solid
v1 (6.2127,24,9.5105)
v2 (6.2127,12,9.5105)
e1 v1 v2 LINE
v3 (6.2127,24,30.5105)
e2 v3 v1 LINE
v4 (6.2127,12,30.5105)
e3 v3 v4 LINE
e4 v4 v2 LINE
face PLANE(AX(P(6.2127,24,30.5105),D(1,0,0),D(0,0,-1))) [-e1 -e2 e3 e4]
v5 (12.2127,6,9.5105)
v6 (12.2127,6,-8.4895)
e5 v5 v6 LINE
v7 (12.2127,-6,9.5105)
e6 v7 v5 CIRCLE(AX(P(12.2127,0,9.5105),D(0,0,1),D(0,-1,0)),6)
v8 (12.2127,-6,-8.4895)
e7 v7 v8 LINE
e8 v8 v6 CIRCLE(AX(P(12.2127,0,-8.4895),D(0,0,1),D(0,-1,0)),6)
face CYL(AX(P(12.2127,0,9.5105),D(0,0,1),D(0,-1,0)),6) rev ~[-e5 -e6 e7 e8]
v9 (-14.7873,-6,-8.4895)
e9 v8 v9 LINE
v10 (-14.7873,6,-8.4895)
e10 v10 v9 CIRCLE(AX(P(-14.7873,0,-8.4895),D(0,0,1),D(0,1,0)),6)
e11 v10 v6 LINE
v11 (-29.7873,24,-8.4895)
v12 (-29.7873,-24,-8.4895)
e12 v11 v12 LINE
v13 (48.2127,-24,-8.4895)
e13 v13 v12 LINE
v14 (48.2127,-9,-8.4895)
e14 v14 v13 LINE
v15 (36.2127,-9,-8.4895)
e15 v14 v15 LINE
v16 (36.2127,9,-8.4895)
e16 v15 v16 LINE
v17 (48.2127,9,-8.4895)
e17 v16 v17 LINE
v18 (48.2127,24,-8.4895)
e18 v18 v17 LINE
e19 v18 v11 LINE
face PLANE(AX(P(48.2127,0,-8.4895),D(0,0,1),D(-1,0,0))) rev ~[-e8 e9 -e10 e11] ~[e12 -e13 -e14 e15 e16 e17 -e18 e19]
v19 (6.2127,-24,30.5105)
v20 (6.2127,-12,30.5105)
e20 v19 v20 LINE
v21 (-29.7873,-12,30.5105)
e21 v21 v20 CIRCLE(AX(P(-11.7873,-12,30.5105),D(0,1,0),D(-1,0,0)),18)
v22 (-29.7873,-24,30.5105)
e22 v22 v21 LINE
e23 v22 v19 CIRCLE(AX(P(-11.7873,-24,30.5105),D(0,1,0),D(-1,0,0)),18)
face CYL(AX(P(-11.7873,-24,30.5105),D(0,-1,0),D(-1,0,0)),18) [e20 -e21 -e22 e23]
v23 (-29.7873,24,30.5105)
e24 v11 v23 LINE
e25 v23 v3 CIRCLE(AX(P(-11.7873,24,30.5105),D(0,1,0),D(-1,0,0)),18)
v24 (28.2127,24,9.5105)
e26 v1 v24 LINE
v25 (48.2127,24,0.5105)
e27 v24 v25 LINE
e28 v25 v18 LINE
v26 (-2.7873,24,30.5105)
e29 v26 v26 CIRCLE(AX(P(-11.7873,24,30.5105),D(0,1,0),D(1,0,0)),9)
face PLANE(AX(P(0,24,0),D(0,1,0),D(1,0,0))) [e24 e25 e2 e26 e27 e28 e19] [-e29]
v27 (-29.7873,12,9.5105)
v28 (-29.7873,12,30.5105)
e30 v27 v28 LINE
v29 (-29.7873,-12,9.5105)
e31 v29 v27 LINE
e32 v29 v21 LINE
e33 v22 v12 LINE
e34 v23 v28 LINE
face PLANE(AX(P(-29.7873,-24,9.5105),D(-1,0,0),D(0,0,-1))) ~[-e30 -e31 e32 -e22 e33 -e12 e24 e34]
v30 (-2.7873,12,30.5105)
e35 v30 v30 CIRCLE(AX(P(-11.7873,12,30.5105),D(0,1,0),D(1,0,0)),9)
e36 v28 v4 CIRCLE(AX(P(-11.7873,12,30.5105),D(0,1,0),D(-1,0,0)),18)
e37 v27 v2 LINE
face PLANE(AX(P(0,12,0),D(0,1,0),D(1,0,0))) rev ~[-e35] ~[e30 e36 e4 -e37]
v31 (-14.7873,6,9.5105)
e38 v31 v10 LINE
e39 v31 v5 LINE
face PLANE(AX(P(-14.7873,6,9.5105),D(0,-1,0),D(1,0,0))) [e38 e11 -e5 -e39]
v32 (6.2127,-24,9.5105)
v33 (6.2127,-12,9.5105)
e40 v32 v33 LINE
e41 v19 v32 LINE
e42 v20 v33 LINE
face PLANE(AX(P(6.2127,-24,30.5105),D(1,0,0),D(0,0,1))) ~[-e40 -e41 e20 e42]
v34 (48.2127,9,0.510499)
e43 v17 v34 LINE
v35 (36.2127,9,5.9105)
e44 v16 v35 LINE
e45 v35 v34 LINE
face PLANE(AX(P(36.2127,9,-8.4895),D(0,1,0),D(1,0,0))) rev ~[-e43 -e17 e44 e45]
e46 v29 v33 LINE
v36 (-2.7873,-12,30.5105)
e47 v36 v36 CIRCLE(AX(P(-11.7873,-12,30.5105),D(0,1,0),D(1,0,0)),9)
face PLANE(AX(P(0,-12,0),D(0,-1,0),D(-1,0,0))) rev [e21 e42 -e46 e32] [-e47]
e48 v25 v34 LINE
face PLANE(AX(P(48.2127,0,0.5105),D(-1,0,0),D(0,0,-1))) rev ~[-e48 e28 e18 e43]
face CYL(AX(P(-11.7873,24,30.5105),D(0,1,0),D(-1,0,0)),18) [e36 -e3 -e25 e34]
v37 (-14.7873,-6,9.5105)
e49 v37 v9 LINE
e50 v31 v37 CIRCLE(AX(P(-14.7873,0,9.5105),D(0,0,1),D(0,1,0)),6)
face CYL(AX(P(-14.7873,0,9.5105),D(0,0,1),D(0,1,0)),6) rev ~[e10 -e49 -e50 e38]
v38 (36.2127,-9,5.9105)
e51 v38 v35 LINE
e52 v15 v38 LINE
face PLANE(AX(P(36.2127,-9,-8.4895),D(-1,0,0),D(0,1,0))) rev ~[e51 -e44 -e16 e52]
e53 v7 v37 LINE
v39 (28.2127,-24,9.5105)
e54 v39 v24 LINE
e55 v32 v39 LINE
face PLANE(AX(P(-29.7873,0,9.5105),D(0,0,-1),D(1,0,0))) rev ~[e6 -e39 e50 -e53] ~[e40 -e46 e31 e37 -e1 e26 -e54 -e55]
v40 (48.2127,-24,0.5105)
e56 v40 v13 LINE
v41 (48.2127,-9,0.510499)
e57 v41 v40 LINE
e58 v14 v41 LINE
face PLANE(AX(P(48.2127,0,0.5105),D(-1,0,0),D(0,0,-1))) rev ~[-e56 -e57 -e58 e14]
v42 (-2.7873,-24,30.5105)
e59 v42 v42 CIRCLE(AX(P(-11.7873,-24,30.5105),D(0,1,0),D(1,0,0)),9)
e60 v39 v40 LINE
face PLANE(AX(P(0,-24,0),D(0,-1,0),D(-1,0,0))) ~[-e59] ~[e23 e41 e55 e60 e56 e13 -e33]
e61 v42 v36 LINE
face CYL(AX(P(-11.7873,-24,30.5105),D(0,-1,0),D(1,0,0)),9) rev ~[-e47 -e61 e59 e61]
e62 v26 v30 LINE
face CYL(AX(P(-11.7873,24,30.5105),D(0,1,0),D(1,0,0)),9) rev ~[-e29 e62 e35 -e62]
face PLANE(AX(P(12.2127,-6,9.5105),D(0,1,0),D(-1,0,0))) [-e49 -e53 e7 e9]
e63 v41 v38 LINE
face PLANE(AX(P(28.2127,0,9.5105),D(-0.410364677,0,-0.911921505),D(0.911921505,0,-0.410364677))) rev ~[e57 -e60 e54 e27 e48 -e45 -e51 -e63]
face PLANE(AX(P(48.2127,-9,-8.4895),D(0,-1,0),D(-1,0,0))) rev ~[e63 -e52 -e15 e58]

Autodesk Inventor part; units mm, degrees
ref_plane "YZ Plane" through (0, 0, 0) normal (1, 0, 0) x (0, 1, 0)
ref_plane "XZ Plane" through (0, 0, 0) normal (0, 1, 0) x (-1, 0, 0)
ref_plane "XY Plane" through (0, 0, 0) normal (0, 0, 1) x (1, 0, 0)
sketch "草图2" plane through (0, 0, 0) normal (0, 1, 0) x (-1, 0, 0)
  line L0 (29.7873, 9.5105) -> (-28.2127, 9.5105)
  line L1 (-28.2127, 9.5105) -> (-48.2127, 0.5105)
  line L2 (-48.2127, 0.5105) -> (-48.2127, -8.4895)
  line L3 (-48.2127, -8.4895) -> (29.7873, -8.4895)
  line L4 (29.7873, -8.4895) -> (29.7873, 9.5105)
  dimension "d3" = 9
  dimension "d4" = 78
  dimension "d5" = 18
  dimension "d6" = 58
extrude "拉伸1" add sketch "草图2" along normal mid plane 48
sketch "草图3" plane through (48.2127, 24, -8.4895) normal (0, 0, -1) x (-1, 0, 0)
  line L0 (78, -48) -> (78, 0) projected
  line L1 (0, 0) -> (78, 0) projected
  line L2 (0, -48) -> (0, 0) projected
  line L3 (78, -48) -> (0, -48) projected
  line L4 (0, -48) -> (0, 0) projected
  line L5 (0, -33) -> (12, -33)
  line L6 (12, -33) -> (12, -15)
  line L7 (12, -15) -> (0, -15)
  line L8 (0, -15) -> (0, -33)
  point P0 (48.2127, -24)
  point P1 (0, -24)
  point P2 (0, -24)
  point P3 (0, -24)
  dimension "d9" = 18
  dimension "d10" = 12
extrude "拉伸2" cut sketch "草图3" against normal up to surface contours L2 L7 L6 L5 surface through (28.2127, 0, 9.5105) normal (0.4103647, 0, 0.9119215)
sketch "草图4" plane through (0, 24, 0) normal (0, 1, 0) x (1, 0, 0)
  line L0 (28.2127, -9.5105) -> (48.2127, -0.5105) projected
  line L1 (48.2127, -0.5105) -> (48.2127, 8.4895) projected
  line L2 (48.2127, 8.4895) -> (-29.7873, 8.4895) projected
  line L3 (-29.7873, 8.4895) -> (-29.7873, -9.5105) projected
  line L4 (-29.7873, -9.5105) -> (28.2127, -9.5105) projected
  line L5 (28.2127, -9.5105) -> (-29.7873, -9.5105) projected
  line L6 (-29.7873, -9.5105) -> (-29.7873, -30.5105)
  arc A0 (-29.7873, -30.5105) -> (6.2127, -30.5105) centre (-11.7873, -30.5105) ccw
  line L7 (6.2127, -30.5105) -> (6.2127, -9.5105)
  circle A1 centre (-11.7873, -30.5105) radius 9
  point P0 (0, 0)
  dimension "d13" = 39
  dimension "d14" = 18
  dimension "d15" = 18
extrude "拉伸3" add sketch "草图4" against normal blind 12 contours L7 A0 L6 L4
mirror "镜像1" about plane through (0, 0, 0) normal (0, 1, 0) of "拉伸3"
sketch "草图5" plane through (28.2127, -24, 9.5105) normal (0, 0, 1) x (1, 0, 0)
  line L0 (-58, 12) -> (-22, 12) projected
  line L1 (-22, 12) -> (-22, 0) projected
  line L2 (0, 0) -> (-22, 0) projected
  line L3 (0, 48) -> (0, 0) projected
  line L4 (-22, 48) -> (0, 48) projected
  line L5 (-22, 48) -> (-22, 36) projected
  line L6 (-22, 36) -> (-58, 36) projected
  line L7 (-58, 12) -> (-58, 36) projected
  line L8 (-16, 18) -> (-43, 18)
  arc A0 (-43, 30) -> (-43, 18) centre (-43, 24) ccw
  line L9 (-43, 30) -> (-16, 30)
  arc A1 (-16, 18) -> (-16, 30) centre (-16, 24) ccw
  point P0 (-28.2127, 24)
  point P1 (-58, 24)
  dimension "d18" = 6
  dimension "d19" = 27
  dimension "d20" = 15
extrude "拉伸4" cut sketch "草图5" against normal up to surface (18 mm away) contours L8 A0 L9 A1
